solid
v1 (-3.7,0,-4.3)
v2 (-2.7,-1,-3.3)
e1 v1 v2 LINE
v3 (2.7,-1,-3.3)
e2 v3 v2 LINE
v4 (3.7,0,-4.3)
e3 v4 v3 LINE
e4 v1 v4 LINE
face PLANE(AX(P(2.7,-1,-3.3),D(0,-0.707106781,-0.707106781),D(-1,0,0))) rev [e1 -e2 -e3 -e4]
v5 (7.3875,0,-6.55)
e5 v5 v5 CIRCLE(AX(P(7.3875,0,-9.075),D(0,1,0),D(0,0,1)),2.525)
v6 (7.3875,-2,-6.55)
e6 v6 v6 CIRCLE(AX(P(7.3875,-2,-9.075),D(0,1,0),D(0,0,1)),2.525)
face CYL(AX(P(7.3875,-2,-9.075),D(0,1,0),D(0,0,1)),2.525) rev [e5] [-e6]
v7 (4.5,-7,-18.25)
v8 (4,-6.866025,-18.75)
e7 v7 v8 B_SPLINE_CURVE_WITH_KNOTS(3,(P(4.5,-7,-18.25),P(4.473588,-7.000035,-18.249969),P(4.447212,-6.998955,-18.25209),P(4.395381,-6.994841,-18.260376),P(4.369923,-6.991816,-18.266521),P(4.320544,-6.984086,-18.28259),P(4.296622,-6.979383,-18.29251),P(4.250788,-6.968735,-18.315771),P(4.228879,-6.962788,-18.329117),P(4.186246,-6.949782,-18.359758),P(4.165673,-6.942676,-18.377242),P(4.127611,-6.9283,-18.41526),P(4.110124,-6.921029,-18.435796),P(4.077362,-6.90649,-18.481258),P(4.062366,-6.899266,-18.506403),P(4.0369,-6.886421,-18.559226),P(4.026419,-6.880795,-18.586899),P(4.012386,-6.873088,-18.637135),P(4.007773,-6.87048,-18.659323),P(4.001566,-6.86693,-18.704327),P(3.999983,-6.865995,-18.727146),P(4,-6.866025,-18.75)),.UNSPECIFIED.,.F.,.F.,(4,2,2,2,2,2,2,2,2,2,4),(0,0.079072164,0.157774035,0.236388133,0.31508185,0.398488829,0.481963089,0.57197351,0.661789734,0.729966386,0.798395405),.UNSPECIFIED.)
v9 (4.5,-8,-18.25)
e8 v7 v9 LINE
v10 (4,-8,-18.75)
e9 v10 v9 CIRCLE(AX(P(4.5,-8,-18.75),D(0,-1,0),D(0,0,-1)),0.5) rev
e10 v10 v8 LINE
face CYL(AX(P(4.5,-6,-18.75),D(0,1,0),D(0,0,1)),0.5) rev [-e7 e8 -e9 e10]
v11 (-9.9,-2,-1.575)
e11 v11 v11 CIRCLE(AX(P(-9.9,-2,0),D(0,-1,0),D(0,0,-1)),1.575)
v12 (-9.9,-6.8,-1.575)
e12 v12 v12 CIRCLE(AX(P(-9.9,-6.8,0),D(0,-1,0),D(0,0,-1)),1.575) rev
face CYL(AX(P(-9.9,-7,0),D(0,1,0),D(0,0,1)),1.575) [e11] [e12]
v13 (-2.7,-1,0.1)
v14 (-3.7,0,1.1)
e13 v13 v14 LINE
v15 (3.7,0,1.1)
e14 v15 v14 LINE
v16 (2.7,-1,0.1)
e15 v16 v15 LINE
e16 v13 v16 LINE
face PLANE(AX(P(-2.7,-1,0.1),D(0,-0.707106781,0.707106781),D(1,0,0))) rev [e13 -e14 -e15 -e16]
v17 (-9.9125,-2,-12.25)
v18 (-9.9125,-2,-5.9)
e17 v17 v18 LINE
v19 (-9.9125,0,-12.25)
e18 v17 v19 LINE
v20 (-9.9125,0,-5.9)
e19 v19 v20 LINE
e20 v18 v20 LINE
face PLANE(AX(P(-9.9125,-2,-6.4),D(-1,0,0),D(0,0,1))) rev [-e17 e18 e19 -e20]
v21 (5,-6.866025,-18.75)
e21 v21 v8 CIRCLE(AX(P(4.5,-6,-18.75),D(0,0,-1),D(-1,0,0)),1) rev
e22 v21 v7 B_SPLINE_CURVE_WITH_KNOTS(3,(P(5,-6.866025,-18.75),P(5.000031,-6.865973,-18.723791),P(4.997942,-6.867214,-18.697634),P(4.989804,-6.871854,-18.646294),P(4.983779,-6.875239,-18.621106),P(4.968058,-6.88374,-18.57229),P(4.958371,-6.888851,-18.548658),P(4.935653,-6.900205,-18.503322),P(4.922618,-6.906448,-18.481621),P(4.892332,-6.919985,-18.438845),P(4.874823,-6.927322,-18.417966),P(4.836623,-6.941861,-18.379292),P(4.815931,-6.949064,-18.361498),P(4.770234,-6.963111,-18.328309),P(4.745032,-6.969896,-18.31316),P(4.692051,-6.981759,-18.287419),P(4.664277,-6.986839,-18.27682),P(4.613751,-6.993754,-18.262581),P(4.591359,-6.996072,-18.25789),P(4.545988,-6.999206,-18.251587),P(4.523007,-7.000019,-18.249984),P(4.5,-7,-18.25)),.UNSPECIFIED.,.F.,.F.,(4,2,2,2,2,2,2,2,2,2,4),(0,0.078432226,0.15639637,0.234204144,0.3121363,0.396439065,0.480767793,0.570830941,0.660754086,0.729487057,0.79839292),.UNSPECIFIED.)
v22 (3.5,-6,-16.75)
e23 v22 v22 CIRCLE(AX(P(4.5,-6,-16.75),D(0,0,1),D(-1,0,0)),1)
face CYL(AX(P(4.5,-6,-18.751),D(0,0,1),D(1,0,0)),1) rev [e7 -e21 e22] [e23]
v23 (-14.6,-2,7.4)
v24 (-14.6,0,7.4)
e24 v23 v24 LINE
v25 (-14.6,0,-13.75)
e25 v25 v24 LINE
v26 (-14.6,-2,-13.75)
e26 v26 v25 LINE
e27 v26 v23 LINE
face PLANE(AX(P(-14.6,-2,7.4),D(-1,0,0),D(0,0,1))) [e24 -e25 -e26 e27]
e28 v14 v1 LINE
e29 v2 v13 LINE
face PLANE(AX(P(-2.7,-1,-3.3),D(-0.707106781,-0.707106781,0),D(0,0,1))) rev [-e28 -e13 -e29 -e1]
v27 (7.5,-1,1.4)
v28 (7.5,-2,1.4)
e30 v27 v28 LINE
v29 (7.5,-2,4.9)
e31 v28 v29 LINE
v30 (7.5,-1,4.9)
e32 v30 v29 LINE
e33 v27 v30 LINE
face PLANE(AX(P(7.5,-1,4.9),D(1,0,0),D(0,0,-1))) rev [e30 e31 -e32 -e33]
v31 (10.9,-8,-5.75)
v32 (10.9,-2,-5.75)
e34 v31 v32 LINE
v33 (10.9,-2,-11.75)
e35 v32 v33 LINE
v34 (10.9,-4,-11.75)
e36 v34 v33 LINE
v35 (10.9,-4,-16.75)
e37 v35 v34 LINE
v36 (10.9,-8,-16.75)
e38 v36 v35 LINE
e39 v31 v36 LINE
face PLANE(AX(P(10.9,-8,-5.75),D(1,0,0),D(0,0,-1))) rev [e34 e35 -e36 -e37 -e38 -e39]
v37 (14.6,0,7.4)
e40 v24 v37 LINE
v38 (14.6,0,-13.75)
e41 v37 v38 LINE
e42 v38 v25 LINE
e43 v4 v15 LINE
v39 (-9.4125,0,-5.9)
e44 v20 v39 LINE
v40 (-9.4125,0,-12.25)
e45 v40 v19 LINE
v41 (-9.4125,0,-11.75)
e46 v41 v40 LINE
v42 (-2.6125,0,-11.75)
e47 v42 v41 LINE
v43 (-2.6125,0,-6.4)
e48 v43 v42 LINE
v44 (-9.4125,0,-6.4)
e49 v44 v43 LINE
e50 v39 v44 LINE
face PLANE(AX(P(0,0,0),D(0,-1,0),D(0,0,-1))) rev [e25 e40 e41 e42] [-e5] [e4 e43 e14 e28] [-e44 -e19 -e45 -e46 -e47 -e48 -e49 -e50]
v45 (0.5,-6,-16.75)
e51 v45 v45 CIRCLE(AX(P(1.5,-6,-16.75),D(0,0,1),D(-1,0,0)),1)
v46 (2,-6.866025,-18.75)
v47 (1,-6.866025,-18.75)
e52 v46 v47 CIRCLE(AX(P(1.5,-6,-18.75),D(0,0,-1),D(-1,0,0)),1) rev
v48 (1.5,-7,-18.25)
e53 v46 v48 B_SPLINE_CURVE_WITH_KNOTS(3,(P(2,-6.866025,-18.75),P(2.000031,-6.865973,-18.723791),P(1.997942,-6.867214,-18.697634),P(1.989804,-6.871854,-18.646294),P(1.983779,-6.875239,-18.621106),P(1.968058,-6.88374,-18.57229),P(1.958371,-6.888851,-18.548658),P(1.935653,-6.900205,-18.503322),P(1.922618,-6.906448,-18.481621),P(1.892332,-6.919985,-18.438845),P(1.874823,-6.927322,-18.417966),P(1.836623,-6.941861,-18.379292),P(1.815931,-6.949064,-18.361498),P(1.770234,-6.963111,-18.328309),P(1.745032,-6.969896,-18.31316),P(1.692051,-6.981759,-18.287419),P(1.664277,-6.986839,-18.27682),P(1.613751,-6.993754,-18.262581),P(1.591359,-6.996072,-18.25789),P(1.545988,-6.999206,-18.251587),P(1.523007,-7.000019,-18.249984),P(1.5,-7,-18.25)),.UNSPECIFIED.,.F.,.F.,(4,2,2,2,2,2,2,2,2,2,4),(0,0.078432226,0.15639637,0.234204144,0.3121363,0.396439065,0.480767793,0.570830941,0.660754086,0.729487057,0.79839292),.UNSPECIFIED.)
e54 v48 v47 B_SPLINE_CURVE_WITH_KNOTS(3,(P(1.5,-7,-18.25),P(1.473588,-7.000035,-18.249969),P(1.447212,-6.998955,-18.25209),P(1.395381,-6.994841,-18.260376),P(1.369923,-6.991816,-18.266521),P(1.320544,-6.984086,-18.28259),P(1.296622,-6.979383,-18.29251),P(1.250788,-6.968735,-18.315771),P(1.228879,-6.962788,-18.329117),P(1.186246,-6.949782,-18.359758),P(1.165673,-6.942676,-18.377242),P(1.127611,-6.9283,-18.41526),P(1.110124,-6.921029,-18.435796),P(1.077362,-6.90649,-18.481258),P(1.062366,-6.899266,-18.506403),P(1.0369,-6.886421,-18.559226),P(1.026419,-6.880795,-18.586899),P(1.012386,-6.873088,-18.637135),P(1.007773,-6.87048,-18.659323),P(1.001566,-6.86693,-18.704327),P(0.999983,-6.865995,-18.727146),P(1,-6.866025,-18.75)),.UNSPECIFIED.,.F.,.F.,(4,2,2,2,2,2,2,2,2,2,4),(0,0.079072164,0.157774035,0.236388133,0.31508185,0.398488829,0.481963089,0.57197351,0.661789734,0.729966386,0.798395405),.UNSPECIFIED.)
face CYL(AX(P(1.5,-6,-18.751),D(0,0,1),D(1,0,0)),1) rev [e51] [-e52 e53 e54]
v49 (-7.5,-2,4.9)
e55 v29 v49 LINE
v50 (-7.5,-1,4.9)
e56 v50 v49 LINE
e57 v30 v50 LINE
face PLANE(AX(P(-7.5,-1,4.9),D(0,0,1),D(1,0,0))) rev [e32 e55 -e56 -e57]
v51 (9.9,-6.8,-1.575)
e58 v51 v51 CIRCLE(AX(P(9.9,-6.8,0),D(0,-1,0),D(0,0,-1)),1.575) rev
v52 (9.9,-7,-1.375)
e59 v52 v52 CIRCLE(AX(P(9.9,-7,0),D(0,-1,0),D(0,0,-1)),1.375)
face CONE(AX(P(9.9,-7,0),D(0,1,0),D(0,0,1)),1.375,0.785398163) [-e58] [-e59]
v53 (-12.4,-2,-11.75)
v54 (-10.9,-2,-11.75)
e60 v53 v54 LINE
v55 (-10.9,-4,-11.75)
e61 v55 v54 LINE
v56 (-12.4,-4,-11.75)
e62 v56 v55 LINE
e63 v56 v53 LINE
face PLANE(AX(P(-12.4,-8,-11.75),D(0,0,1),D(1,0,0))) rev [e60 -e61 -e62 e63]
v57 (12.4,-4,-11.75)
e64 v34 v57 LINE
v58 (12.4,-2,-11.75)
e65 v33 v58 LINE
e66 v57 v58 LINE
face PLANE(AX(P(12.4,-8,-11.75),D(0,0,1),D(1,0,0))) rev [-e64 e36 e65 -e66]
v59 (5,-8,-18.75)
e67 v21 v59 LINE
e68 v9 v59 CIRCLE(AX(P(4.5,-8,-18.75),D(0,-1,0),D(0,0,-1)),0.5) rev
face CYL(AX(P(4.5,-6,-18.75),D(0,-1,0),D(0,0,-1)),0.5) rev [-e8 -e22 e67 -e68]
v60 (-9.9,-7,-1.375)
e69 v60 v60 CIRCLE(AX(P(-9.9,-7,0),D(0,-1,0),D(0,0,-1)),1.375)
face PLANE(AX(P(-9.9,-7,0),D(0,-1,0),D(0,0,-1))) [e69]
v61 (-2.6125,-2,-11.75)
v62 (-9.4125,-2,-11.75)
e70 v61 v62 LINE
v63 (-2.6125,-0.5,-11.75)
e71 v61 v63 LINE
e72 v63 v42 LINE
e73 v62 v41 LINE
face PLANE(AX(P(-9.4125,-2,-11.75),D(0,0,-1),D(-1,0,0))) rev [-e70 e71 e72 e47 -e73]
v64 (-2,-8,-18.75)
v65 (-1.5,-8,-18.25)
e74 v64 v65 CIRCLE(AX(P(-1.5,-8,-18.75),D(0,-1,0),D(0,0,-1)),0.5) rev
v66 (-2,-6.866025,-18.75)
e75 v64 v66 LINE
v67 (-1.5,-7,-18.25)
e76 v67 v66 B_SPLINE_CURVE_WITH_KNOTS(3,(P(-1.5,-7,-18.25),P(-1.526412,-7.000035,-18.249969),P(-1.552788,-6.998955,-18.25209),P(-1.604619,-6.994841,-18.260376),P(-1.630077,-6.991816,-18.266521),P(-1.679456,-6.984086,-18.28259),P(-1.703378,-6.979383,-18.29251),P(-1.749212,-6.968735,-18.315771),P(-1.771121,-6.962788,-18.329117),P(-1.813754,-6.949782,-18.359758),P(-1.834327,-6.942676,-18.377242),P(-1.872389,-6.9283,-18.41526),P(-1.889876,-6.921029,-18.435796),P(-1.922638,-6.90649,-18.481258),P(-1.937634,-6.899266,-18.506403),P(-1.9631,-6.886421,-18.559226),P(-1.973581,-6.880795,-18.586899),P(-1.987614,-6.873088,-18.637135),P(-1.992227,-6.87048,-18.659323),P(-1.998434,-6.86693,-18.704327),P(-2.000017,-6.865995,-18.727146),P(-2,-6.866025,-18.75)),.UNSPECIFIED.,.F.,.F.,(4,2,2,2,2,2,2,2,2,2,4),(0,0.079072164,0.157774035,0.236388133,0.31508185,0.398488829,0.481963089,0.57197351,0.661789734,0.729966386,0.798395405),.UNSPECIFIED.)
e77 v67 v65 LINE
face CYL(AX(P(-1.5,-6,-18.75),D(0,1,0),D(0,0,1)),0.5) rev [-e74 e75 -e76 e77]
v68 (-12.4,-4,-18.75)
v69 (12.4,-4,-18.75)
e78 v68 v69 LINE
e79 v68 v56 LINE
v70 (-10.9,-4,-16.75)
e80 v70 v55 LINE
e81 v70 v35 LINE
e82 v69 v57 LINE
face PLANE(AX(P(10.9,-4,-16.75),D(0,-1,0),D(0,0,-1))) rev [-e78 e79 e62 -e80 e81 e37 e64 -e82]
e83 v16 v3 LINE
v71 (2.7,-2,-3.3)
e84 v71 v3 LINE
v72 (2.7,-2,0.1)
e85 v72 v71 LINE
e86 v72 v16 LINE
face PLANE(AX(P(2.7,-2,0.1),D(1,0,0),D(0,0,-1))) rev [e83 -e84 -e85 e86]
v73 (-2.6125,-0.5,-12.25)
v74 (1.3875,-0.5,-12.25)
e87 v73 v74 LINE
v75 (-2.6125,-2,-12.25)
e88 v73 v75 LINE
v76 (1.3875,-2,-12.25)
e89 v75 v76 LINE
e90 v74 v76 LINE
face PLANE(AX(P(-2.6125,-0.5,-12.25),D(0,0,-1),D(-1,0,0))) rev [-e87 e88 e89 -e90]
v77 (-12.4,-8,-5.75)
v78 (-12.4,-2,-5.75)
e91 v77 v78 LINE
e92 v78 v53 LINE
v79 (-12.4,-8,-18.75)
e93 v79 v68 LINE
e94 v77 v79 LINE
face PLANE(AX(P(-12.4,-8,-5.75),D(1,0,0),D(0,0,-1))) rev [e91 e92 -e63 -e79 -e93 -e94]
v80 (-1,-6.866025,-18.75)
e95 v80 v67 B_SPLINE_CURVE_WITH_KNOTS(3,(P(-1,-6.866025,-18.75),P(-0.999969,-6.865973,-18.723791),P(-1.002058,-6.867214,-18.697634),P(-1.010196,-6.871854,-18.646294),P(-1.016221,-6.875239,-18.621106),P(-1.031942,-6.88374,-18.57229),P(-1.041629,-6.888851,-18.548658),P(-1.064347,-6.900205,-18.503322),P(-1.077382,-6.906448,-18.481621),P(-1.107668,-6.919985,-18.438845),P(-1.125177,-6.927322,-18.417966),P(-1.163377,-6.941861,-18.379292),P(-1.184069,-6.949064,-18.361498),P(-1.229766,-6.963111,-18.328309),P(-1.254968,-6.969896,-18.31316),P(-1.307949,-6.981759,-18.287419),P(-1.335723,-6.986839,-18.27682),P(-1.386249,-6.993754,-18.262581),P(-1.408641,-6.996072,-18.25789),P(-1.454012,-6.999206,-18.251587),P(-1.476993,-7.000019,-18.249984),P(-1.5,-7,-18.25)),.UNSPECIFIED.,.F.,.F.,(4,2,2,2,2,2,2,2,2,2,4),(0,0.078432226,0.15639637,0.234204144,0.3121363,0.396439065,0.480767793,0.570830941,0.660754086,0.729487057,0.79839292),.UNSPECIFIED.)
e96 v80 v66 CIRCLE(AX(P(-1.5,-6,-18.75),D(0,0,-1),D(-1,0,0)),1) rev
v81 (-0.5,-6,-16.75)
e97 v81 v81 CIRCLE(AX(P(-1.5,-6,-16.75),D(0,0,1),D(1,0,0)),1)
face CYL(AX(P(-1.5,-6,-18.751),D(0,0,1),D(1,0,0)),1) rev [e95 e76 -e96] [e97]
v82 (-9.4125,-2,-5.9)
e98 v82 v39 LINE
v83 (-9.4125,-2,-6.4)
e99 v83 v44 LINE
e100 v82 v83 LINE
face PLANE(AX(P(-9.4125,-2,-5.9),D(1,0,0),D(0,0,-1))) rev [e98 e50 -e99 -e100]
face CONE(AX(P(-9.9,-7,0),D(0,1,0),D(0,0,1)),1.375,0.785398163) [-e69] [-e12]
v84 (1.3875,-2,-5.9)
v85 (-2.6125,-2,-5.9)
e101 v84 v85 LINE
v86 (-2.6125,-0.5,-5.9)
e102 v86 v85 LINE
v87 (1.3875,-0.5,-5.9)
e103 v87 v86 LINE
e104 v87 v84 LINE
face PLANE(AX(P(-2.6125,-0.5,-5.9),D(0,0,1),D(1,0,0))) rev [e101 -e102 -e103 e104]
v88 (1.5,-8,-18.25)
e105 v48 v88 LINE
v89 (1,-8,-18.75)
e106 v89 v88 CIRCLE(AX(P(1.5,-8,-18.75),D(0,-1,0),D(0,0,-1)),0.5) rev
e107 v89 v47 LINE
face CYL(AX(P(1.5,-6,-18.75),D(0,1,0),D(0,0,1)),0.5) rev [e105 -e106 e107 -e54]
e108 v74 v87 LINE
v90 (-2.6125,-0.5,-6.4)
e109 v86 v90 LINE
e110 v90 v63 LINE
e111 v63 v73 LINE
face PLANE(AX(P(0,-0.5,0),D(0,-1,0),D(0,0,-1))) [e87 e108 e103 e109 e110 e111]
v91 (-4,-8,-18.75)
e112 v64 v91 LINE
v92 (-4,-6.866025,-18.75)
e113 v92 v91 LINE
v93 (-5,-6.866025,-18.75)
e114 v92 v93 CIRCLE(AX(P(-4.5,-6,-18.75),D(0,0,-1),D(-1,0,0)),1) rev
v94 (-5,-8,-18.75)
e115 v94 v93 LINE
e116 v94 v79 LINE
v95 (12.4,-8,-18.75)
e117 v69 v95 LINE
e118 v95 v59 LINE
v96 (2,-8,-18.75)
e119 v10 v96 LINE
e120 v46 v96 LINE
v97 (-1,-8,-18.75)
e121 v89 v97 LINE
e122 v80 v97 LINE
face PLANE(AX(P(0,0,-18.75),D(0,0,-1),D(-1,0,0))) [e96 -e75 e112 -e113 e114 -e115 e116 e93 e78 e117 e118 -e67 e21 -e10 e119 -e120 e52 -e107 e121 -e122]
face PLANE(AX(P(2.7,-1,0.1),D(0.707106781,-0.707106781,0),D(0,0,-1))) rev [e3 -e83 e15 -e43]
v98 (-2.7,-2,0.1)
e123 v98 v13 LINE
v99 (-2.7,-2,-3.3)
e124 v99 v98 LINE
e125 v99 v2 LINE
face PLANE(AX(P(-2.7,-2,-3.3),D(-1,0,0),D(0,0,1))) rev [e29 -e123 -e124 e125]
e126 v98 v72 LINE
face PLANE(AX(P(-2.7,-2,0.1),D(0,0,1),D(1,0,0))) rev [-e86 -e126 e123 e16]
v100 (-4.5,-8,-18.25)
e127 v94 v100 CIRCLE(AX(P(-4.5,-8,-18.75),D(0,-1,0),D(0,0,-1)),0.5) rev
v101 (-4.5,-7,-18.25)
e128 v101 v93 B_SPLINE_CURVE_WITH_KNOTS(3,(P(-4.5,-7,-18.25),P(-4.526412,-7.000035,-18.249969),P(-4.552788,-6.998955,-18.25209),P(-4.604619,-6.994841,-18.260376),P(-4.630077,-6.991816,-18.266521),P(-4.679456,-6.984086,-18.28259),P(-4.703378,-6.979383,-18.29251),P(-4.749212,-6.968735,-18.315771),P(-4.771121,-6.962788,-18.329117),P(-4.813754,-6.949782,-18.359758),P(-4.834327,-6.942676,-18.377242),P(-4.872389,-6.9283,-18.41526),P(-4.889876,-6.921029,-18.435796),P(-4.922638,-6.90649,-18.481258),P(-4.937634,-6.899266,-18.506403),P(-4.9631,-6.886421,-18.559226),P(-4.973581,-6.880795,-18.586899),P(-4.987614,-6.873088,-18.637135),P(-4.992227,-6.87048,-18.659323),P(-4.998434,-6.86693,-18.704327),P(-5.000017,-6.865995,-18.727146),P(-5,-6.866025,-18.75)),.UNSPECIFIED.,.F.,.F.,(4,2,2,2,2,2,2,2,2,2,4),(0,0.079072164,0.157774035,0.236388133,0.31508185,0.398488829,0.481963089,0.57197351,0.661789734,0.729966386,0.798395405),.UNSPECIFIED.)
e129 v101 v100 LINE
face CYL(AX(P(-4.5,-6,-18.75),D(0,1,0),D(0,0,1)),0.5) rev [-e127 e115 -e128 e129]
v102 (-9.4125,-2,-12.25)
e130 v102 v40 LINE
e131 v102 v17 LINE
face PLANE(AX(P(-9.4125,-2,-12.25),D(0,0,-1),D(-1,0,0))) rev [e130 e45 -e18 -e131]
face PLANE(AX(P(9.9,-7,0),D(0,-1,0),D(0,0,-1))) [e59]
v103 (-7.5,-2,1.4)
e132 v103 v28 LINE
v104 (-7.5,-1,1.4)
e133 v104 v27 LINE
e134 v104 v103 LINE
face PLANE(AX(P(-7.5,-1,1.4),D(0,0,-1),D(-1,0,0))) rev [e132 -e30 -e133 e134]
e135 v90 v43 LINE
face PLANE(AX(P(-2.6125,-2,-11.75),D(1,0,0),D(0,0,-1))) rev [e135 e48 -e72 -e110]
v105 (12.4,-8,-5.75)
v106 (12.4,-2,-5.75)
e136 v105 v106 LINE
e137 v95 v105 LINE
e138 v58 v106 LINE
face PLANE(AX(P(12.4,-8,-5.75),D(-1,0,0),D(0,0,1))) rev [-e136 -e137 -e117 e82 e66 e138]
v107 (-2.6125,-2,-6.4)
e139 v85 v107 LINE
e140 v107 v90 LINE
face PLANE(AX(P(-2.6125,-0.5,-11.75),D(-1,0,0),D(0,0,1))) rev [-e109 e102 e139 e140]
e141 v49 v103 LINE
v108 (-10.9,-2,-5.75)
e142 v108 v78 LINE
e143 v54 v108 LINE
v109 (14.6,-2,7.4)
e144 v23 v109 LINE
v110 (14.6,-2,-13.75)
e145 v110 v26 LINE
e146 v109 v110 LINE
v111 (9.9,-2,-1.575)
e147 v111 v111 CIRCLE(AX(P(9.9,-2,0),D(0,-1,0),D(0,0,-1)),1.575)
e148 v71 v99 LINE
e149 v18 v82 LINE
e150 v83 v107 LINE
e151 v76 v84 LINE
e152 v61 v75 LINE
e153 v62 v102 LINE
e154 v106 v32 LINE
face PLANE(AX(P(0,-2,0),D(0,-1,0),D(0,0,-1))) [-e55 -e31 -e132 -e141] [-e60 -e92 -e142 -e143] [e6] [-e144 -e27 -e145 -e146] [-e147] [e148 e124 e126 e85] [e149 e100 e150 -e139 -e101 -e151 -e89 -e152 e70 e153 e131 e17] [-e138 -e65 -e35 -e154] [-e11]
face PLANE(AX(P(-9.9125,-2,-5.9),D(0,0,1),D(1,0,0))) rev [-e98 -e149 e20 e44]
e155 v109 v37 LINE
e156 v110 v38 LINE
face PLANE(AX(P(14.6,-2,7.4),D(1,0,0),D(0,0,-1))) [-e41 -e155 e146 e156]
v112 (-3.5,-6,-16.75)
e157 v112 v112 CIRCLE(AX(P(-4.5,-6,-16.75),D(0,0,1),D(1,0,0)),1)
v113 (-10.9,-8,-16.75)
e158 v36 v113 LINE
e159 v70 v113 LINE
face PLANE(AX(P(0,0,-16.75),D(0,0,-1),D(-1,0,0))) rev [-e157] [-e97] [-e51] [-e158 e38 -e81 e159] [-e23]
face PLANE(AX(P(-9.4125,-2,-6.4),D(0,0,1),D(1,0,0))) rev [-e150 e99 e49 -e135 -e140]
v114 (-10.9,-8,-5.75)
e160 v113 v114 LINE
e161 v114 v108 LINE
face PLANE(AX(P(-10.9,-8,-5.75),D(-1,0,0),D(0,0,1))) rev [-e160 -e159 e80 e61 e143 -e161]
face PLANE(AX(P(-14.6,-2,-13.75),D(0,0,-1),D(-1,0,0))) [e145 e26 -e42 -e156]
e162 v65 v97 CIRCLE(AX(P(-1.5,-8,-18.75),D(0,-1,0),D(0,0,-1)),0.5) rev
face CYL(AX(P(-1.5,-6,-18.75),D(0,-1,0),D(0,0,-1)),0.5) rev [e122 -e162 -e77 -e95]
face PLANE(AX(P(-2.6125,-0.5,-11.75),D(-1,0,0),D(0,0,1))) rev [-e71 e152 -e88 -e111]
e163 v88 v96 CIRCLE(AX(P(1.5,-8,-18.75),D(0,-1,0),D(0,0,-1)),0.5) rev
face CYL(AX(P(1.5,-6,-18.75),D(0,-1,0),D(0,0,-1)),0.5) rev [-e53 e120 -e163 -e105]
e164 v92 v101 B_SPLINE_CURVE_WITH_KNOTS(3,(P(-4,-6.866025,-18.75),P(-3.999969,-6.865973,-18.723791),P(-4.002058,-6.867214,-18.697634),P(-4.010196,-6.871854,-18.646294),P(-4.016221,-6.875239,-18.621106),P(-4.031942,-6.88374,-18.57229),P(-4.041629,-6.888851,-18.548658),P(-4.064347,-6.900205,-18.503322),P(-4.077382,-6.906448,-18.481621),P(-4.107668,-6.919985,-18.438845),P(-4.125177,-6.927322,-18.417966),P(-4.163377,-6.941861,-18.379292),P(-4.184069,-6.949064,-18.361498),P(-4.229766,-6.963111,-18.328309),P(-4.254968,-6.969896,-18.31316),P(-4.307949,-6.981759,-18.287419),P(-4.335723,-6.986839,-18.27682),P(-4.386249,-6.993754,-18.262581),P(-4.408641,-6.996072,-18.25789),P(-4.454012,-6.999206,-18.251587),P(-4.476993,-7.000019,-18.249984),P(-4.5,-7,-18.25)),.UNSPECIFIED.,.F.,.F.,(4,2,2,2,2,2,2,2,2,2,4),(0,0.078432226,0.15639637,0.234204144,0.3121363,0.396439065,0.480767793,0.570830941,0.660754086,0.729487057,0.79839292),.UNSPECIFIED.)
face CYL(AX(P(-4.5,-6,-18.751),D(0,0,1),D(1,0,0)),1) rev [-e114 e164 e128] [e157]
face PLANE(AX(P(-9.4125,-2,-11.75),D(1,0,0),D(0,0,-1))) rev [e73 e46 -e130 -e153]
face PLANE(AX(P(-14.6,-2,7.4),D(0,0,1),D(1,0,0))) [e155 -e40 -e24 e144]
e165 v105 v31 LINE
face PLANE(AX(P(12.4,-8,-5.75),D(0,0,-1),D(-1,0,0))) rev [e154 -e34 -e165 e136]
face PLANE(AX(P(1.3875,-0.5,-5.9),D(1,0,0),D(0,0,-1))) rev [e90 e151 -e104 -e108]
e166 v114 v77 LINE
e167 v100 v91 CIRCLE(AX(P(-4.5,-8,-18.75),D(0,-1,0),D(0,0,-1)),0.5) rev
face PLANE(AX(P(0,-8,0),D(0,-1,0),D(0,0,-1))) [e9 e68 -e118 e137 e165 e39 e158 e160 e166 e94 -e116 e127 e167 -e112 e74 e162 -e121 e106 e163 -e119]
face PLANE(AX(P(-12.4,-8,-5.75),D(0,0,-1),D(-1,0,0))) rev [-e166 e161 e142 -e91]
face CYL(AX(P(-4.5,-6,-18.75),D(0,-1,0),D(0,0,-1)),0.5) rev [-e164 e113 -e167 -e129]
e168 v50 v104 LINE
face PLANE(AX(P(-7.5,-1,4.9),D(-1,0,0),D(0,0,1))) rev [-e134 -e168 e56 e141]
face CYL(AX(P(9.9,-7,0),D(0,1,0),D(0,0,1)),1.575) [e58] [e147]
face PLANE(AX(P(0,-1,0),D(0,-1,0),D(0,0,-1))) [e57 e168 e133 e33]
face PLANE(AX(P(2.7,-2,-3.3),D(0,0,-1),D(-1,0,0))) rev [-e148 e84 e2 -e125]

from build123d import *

# Parameters (mm, degrees)
PARTS_W             = 29.2
PARTS_H             = 21.15
MAIN_FACE_DEPTH     = 2
SKETCH3_R           = 2.525
IR_CUT_DEPTH        = 2
TSOP_GROOVE_DEPTH   = 1.5
SKETCH4_W           = 5.4
SKETCH4_H           = 3.4
TOF_CUT_DEPTH       = 2
SKETCH6_R           = 1.575
SHAFTS_DEPTH        = 5
CHAMFER1_SIZE       = 0.2
SKETCH7_W           = 15
SKETCH7_H           = 3.5
PINSLOTS_DEPTH      = 1
TOFWINDOW_SIZE      = 1
SKETCH8_W           = 1.5
SKETCH8_H           = 6
BOSS_EXTRUDE1_DEPTH = 6
SKETCH14_W          = 1.5
SKETCH14_H          = 4
BOSS_EXTRUDE4_DEPTH = 5
SKETCH15_W          = 24.8
SKETCH15_H          = 4
BOSS_EXTRUDE5_DEPTH = 2
CUT_EXTRUDE4_REACH  = 31.332
SKETCH16_R          = 1
CUT_EXTRUDE5_START  = -0.5
CUT_EXTRUDE5_DEPTH  = 0.5
FILLET1_R           = 0.5


with BuildPart() as part:
    # Parts → Main Face (new body)
    with BuildSketch(Plane(origin=(0, 0, 0), x_dir=(1, 0, 0), z_dir=(0, 1, 0))):
        with Locations((0, 3.175)):
            Rectangle(PARTS_W, PARTS_H)
    extrude(amount=-MAIN_FACE_DEPTH)

    # Sketch3 → IR Cut (cut)
    with BuildSketch(Plane(origin=(0, 0, 0), x_dir=(1, 0, 0), z_dir=(0, 1, 0))):
        with Locations(Location((7.3875, 9.075, 0), (0, 0, 270))):
            Circle(SKETCH3_R)
        Polygon((-2.6125, 11.75), (-2.6125, 6.4), (-9.4125, 6.4), (-9.4125, 5.9), (-9.9125, 5.9), (-9.9125, 6.4), (-9.9125, 11.75), (-9.9125, 12.25), (-9.4125, 12.25), (-9.4125, 11.75), align=None)
    extrude(amount=-IR_CUT_DEPTH, mode=Mode.SUBTRACT)

    # Sketch5 → TSOP Groove (cut)
    with BuildSketch(Plane.XZ.offset(2)):
        Polygon((-2.6125, -11.75), (-2.6125, -6.4), (-2.6125, -5.9), (1.3875, -5.9), (1.3875, -6.4), (1.3875, -11.75), (1.3875, -12.25), (-2.6125, -12.25), align=None)
    extrude(amount=-TSOP_GROOVE_DEPTH, mode=Mode.SUBTRACT)

    # Sketch4 → TOF Cut (cut)
    with BuildSketch(Plane(origin=(0, 0, 0), x_dir=(1, 0, 0), z_dir=(0, 1, 0))):
        with Locations((0, 1.6)):
            Rectangle(SKETCH4_W, SKETCH4_H)
    extrude(amount=-TOF_CUT_DEPTH, mode=Mode.SUBTRACT)

    # Sketch6 → Shafts (add)
    with BuildSketch(Plane.XZ.offset(2)):
        with Locations(Location((-9.9, 0, 0), (0, 0, 270))):
            Circle(SKETCH6_R)
        with Locations(Location((9.9, 0, 0), (0, 0, 270))):
            Circle(SKETCH6_R)
    extrude(amount=SHAFTS_DEPTH)

    # Chamfer1
    chamfer1_edges = [part.edges().sort_by_distance(p)[0] for p in [
        (9.9, -7, 1.575),
        (-9.9, -7, 1.575),
    ]]
    chamfer(chamfer1_edges, length=CHAMFER1_SIZE)

    # Sketch7 → PinSlots (cut)
    with BuildSketch(Plane.XZ.offset(2)):
        with Locations((0, 3.15)):
            Rectangle(SKETCH7_W, SKETCH7_H)
    extrude(amount=-PINSLOTS_DEPTH, mode=Mode.SUBTRACT)

    # ToFWindow
    tofwindow_edges = [part.edges().sort_by_distance(p)[0] for p in [
        (-2.7, 0, -1.6),
        (0, 0, 0.1),
        (2.7, 0, -1.6),
        (0, 0, -3.3),
    ]]
    chamfer(tofwindow_edges, length=TOFWINDOW_SIZE)

    # Sketch8 → Boss-Extrude1 (add)
    with BuildSketch(Plane.XZ.offset(2)):
        with Locations((-11.65, -8.75)):
            Rectangle(SKETCH8_W, SKETCH8_H)
        with Locations((11.65, -8.75)):
            Rectangle(SKETCH8_W, SKETCH8_H)
    extrude(amount=BOSS_EXTRUDE1_DEPTH)

    # Sketch14 → Boss-Extrude4 (add)
    with BuildSketch(Plane(origin=(0, 0, -11.75), x_dir=(-1, 0, 0), z_dir=(0, 0, -1))):
        with Locations((-11.65, -6)):
            Rectangle(SKETCH14_W, SKETCH14_H)
        with Locations((11.65, -6)):
            Rectangle(SKETCH14_W, SKETCH14_H)
    extrude(amount=BOSS_EXTRUDE4_DEPTH)

    # Sketch15 → Boss-Extrude5 (add)
    with BuildSketch(Plane(origin=(0, 0, -16.75), x_dir=(-1, 0, 0), z_dir=(0, 0, -1))):
        with Locations((0, -6)):
            Rectangle(SKETCH15_W, SKETCH15_H)
    extrude(amount=BOSS_EXTRUDE5_DEPTH)

    # Sketch16 → Cut-Extrude4 (cut, up to next)
    with BuildSketch(Plane.XY.offset(-16.75), mode=Mode.PRIVATE) as cut_extrude4_sk1:
        with Locations((-4.5, -6)):
            Circle(SKETCH16_R)
    cut_extrude4_tool1 = extrude(cut_extrude4_sk1.sketch, amount=-CUT_EXTRUDE4_REACH, mode=Mode.PRIVATE) & part.part
    # Sketch16 → Cut-Extrude4 (cut, up to next)
    with BuildSketch(Plane.XY.offset(-16.75), mode=Mode.PRIVATE) as cut_extrude4_sk2:
        with Locations((-1.5, -6)):
            Circle(SKETCH16_R)
    cut_extrude4_tool2 = extrude(cut_extrude4_sk2.sketch, amount=-CUT_EXTRUDE4_REACH, mode=Mode.PRIVATE) & part.part
    # Sketch16 → Cut-Extrude4 (cut, up to next)
    with BuildSketch(Plane.XY.offset(-16.75), mode=Mode.PRIVATE) as cut_extrude4_sk3:
        with Locations(Location((1.5, -6, 0), (0, 0, 180))):
            Circle(SKETCH16_R)
    cut_extrude4_tool3 = extrude(cut_extrude4_sk3.sketch, amount=-CUT_EXTRUDE4_REACH, mode=Mode.PRIVATE) & part.part
    # Sketch16 → Cut-Extrude4 (cut, up to next)
    with BuildSketch(Plane.XY.offset(-16.75), mode=Mode.PRIVATE) as cut_extrude4_sk4:
        with Locations(Location((4.5, -6, 0), (0, 0, 180))):
            Circle(SKETCH16_R)
    cut_extrude4_tool4 = extrude(cut_extrude4_sk4.sketch, amount=-CUT_EXTRUDE4_REACH, mode=Mode.PRIVATE) & part.part
    add(cut_extrude4_tool1.solids().sort_by_distance((-4.5, -6, -16.75))[0], mode=Mode.SUBTRACT)
    add(cut_extrude4_tool2.solids().sort_by_distance((-1.5, -6, -16.75))[0], mode=Mode.SUBTRACT)
    add(cut_extrude4_tool3.solids().sort_by_distance((1.5, -6, -16.75))[0], mode=Mode.SUBTRACT)
    add(cut_extrude4_tool4.solids().sort_by_distance((4.5, -6, -16.75))[0], mode=Mode.SUBTRACT)

    # Sketch17 → Cut-Extrude5 (cut)
    with BuildSketch(Plane(origin=(0, 0, -18.75), x_dir=(-1, 0, 0), z_dir=(0, 0, -1)).offset(CUT_EXTRUDE5_START)):
        with BuildLine():
            Line((-5, -6.866025404), (-5, -8))
            Line((-5, -8), (-4, -8))
            Line((-4, -8), (-4, -6.866025404))
            ThreePointArc((-4, -6.866025404), (-4.5, -7), (-5, -6.866025404))
        make_face()
        with BuildLine():
            Line((-1, -8), (-1, -6.866025404))
            ThreePointArc((-1, -6.866025404), (-1.5, -7), (-2, -6.866025404))
            Line((-2, -6.866025404), (-2, -8))
            Line((-2, -8), (-1, -8))
        make_face()
        with BuildLine():
            Line((2, -8), (2, -6.866025404))
            ThreePointArc((2, -6.866025404), (1.5, -7), (1, -6.866025404))
            Line((1, -6.866025404), (1, -8))
            Line((1, -8), (2, -8))
        make_face()
        with BuildLine():
            Line((5, -8), (5, -6.866025404))
            ThreePointArc((5, -6.866025404), (4.5, -7), (4, -6.866025404))
            Line((4, -6.866025404), (4, -8))
            Line((4, -8), (5, -8))
        make_face()
    extrude(amount=CUT_EXTRUDE5_DEPTH, mode=Mode.SUBTRACT)

    # Fillet1
    fillet1_edges = [part.edges().sort_by_distance(p)[0] for p in [
        (-5, -7.433012702, -18.25),
        (-4, -7.433012702, -18.25),
        (-2, -7.433012702, -18.25),
        (-1, -7.433012702, -18.25),
        (1, -7.433012702, -18.25),
        (2, -7.433012702, -18.25),
        (4, -7.433012702, -18.25),
        (5, -7.433012702, -18.25),
    ]]
    fillet(fillet1_edges, radius=FILLET1_R - 0.0001)  # a hair under: the kernel refuses the full size


solid = part.part
